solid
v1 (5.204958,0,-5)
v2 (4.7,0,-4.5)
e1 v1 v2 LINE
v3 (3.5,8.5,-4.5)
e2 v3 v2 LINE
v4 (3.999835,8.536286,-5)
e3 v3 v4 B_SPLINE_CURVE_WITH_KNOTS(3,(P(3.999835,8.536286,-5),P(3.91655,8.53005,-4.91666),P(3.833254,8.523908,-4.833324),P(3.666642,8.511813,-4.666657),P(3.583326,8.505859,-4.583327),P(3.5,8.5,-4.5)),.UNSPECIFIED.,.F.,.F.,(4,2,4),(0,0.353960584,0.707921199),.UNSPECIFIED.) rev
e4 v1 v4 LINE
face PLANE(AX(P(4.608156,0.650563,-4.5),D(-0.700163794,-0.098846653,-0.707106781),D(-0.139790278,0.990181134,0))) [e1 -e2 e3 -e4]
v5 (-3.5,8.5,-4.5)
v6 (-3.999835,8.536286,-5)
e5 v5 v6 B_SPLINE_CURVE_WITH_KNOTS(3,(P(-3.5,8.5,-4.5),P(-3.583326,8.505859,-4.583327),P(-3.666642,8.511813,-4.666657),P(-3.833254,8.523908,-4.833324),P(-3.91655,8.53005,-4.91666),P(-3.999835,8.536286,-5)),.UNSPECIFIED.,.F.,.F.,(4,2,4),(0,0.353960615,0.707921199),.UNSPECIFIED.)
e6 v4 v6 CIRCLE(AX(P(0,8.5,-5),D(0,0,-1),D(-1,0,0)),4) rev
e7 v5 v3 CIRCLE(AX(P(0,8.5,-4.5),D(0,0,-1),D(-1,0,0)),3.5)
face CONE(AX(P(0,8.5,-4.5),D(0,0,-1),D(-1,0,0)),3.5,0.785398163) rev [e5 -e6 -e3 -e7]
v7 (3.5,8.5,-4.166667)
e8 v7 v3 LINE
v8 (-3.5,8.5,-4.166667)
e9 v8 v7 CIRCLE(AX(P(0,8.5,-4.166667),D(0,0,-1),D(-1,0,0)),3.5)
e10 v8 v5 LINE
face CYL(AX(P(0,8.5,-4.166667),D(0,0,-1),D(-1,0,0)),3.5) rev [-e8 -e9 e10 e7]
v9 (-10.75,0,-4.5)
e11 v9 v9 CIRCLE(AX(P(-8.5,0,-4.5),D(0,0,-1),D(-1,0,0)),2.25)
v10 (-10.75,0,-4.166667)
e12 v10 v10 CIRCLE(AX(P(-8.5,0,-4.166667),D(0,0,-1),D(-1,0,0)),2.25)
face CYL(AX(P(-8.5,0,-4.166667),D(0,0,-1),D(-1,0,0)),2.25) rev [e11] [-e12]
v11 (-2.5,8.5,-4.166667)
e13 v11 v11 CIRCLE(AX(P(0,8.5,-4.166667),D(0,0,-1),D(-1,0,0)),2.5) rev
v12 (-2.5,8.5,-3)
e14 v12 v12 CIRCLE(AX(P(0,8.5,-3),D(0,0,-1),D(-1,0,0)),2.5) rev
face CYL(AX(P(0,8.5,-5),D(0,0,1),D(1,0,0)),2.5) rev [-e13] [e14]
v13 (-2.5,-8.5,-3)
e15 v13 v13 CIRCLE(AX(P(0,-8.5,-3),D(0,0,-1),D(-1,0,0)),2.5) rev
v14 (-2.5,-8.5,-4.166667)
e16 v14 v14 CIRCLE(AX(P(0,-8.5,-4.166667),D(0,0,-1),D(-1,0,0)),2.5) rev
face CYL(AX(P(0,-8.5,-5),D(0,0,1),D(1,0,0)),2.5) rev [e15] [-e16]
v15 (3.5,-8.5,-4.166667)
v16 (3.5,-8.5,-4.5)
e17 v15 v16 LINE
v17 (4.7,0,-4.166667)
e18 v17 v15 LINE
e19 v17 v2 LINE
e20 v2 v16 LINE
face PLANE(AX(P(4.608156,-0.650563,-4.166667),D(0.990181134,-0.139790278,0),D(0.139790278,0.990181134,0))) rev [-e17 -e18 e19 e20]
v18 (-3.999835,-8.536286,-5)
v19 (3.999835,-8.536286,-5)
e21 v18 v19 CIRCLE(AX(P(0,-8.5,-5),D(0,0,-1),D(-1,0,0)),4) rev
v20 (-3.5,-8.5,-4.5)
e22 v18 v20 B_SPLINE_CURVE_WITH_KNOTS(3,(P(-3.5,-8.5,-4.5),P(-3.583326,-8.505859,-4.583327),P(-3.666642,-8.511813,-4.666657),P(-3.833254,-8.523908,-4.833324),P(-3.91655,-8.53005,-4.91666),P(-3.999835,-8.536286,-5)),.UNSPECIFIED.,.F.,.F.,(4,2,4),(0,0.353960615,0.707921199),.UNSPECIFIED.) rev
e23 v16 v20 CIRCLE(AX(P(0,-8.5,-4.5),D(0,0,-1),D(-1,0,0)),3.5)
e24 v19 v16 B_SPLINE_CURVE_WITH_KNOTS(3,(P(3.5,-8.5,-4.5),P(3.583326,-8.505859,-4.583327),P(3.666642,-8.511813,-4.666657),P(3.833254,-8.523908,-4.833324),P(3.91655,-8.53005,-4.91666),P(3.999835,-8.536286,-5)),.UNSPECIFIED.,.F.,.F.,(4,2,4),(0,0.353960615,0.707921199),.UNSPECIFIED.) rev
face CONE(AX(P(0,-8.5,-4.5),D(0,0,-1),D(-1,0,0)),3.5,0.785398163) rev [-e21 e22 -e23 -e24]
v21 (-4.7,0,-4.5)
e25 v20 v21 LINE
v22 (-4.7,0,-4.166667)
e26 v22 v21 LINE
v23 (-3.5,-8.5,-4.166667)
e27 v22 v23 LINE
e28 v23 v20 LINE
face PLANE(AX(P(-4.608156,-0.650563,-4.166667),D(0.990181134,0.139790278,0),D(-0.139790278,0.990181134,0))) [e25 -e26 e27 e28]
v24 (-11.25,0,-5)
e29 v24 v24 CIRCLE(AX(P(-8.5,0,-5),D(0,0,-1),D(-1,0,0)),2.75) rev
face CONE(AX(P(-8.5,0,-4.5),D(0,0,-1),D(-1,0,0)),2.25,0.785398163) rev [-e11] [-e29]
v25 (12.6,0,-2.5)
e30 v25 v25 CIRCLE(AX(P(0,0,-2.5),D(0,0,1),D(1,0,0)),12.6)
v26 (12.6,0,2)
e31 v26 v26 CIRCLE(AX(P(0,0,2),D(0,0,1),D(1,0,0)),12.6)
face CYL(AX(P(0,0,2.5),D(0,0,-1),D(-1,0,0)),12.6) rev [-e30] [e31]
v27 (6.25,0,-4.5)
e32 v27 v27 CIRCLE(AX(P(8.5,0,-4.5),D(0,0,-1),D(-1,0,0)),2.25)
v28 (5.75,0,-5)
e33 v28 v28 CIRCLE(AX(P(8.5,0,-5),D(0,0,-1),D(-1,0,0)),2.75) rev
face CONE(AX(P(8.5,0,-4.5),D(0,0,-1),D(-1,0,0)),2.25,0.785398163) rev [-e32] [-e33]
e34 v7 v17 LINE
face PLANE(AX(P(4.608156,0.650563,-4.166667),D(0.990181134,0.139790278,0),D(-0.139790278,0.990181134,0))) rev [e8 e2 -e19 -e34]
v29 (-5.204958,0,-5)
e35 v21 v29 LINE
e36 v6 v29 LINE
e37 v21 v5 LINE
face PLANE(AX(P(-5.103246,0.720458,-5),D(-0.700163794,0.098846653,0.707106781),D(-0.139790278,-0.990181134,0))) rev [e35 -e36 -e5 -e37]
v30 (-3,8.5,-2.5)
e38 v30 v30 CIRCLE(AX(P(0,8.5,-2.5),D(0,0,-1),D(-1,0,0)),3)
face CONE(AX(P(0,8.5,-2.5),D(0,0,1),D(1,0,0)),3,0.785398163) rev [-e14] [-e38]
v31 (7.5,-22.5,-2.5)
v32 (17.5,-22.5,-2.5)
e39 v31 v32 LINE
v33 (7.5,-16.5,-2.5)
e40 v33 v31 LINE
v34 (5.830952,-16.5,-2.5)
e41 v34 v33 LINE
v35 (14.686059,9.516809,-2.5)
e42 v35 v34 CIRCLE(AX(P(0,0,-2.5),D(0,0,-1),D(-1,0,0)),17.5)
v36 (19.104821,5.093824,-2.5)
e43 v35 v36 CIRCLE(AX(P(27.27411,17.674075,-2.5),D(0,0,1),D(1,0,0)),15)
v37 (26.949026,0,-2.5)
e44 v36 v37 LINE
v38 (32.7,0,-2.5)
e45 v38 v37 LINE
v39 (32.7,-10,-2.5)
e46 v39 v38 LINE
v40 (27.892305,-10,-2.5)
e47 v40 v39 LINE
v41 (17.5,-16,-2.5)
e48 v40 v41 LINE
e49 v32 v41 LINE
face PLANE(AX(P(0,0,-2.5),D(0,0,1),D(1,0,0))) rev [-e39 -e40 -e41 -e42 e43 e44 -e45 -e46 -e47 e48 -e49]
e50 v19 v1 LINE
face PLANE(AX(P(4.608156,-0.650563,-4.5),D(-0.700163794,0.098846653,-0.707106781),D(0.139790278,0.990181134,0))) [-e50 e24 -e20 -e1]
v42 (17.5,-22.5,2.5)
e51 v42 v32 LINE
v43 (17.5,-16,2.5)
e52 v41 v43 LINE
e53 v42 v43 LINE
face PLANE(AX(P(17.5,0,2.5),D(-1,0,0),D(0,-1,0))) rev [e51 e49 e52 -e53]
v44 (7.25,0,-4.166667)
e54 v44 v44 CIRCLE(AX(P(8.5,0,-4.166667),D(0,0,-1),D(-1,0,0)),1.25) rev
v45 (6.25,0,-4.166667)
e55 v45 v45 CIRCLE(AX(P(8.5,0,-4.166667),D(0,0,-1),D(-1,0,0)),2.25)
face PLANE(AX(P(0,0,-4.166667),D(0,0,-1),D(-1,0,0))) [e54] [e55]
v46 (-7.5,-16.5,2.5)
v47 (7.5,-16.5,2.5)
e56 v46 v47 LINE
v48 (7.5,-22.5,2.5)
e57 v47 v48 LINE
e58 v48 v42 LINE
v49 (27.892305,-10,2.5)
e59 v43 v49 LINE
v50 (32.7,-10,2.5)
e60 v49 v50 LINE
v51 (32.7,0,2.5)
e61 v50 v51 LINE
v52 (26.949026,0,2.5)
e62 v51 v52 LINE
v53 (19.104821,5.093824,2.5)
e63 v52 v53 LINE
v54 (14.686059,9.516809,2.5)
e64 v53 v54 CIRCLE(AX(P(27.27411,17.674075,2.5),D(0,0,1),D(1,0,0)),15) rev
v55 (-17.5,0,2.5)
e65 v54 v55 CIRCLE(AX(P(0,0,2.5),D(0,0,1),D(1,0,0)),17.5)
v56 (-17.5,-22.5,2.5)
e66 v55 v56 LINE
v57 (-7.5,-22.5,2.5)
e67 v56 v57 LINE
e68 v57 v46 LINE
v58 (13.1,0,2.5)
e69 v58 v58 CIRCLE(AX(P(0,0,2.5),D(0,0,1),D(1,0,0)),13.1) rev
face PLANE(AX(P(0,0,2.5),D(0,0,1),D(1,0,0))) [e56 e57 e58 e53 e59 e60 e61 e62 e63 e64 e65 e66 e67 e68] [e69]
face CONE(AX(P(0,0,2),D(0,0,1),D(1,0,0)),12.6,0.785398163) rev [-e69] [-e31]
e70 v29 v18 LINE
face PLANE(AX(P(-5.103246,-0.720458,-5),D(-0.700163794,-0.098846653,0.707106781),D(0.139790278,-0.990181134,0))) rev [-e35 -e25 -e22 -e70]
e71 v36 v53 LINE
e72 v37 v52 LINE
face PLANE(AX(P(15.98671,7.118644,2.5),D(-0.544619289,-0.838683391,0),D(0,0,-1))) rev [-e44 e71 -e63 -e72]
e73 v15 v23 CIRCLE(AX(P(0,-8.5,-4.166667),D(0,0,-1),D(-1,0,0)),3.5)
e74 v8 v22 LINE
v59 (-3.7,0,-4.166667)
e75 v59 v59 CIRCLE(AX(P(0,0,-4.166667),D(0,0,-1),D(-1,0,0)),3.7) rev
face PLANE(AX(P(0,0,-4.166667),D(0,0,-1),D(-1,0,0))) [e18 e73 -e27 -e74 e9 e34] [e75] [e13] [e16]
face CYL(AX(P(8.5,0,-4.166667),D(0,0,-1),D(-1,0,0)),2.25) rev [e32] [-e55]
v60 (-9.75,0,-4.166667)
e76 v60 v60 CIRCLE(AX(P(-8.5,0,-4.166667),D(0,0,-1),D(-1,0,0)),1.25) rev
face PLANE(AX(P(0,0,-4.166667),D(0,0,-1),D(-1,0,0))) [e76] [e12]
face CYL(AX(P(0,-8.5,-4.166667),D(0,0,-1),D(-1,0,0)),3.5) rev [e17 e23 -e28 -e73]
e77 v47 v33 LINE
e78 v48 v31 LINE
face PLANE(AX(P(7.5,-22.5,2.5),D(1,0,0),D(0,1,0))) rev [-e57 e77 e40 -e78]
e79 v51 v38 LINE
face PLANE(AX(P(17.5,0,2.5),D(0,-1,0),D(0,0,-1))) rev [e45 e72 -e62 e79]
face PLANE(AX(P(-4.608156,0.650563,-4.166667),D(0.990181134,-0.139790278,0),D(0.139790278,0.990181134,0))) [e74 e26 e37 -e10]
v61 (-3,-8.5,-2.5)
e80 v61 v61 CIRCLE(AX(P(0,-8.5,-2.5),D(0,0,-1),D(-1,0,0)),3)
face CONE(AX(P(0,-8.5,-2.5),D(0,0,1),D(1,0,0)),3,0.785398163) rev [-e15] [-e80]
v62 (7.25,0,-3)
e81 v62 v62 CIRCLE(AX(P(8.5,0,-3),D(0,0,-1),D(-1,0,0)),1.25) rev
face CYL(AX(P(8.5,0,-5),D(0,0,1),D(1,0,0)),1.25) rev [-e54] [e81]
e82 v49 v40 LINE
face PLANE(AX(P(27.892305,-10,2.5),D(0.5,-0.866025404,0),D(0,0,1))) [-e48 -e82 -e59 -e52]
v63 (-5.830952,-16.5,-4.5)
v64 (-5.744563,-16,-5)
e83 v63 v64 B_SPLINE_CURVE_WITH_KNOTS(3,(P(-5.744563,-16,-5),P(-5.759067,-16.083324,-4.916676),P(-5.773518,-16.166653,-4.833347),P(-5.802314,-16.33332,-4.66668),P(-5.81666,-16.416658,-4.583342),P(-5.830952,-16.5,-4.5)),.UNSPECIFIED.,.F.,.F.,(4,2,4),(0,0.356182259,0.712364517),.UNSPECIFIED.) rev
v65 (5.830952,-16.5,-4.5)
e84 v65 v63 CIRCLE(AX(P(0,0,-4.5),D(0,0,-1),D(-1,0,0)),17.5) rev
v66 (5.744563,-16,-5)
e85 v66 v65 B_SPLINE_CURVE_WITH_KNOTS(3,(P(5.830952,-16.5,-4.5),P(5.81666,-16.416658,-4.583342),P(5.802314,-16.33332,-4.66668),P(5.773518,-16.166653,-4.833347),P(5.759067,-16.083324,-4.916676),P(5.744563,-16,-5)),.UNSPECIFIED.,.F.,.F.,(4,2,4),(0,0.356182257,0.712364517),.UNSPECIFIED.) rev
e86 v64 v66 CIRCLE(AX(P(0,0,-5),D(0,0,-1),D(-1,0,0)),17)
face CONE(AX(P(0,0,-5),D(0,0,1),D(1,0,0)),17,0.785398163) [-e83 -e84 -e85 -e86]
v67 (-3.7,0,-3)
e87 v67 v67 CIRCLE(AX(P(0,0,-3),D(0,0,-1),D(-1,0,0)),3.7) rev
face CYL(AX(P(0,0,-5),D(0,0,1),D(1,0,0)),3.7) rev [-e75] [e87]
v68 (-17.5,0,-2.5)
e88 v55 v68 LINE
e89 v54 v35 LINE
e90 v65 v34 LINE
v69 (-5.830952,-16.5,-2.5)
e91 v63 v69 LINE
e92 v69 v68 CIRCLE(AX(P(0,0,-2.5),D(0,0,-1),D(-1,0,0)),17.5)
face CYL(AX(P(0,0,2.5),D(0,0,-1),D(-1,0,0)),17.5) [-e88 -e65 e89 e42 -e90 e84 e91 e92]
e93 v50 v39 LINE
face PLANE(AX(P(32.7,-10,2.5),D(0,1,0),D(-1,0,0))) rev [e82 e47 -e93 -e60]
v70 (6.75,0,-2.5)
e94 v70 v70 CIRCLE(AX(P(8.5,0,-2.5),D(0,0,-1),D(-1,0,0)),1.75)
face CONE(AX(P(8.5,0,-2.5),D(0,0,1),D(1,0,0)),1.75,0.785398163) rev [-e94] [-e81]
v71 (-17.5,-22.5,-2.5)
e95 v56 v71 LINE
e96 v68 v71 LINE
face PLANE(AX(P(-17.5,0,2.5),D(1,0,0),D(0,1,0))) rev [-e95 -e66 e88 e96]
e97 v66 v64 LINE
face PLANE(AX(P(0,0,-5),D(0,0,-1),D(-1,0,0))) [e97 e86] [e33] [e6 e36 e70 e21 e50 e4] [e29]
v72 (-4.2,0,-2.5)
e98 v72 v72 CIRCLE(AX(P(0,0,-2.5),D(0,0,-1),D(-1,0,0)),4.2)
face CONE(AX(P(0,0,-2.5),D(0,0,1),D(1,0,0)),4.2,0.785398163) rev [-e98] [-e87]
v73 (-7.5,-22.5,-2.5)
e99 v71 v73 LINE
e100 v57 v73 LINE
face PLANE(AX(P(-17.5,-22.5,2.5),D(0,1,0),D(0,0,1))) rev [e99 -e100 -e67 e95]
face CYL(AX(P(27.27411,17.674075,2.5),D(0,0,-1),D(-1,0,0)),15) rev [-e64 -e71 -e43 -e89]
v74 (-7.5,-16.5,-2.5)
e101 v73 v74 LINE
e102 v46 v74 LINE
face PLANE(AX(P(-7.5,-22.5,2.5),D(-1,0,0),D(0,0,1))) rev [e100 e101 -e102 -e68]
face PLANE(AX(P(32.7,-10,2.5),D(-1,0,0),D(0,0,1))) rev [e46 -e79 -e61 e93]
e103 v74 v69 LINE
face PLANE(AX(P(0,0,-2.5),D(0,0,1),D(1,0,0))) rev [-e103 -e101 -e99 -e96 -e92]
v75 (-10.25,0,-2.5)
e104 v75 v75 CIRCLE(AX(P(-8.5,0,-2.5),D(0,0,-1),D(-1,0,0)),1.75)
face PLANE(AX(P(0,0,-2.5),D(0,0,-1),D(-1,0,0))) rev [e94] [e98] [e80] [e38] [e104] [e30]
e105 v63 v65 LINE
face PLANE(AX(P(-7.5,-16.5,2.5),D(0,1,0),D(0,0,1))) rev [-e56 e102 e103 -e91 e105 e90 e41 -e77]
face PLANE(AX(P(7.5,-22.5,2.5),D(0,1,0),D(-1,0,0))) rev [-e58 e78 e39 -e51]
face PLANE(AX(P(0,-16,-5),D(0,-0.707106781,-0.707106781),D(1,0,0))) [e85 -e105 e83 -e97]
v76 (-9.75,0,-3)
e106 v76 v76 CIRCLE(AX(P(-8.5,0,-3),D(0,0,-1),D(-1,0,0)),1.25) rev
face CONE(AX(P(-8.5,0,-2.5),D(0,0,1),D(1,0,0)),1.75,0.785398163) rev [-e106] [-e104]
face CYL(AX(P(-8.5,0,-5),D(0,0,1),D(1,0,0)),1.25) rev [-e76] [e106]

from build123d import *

# Parameters (mm, degrees)
SKETCH1_R           = 12.600000000000001
BOSS_EXTRUDE1_DEPTH = 2.5
BOSS_EXTRUDE3_DEPTH = 2.5
SKETCH4_R           = 1.2499999999999973
SKETCH4_R_2         = 2.5000000000000018
SKETCH4_R_3         = 3.7
BOSS_EXTRUDE4_DEPTH = 2.5
CUT_EXTRUDE1_START  = -0.8333333333333334
SKETCH5_R           = 2.249999999999998
SKETCH5_R_2         = 1.2499999999999973
SKETCH5_R_3         = 2.500000000000002
SKETCH5_R_4         = 3.7
SKETCH5_R_5         = 2.2499999999999987
CUT_EXTRUDE1_DEPTH  = 0.8333333333333334
CHAMFER1_SIZE       = 0.5
CHAMFER2_SIZE       = 0.5
FILLET2_R           = 15
CHAMFER6_SIZE       = 6
CHAMFER6_SIZE2      = 10.392304845413321


with BuildPart() as part:
    # Sketch1 → Boss-Extrude1 (new, symmetric)
    with BuildSketch(Plane.XY):
        with BuildLine():
            Line((-17.5, -22.500000000000004), (-7.500000000000002, -22.500000000000004))
            Line((-7.500000000000002, -22.500000000000004), (-7.500000000000002, -16.5))
            Line((-7.500000000000002, -16.5), (7.500000000000005, -16.5))
            Line((7.500000000000005, -16.5), (7.500000000000007, -22.500000000000004))
            Line((7.500000000000007, -22.500000000000004), (17.500000000000007, -22.5))
            Line((17.500000000000007, -22.5), (17.500000000000004, 0))
            ThreePointArc((17.500000000000004, 0), (-2.81e-15, 17.500000000000004), (-17.500000000000004, -6.94e-15))
            Line((-17.500000000000004, -6.94e-15), (-17.5, -22.500000000000004))
        make_face()
        Circle(SKETCH1_R, mode=Mode.SUBTRACT)
    extrude(amount=BOSS_EXTRUDE1_DEPTH, both=True)

    # Sketch3 → Boss-Extrude3 (add, symmetric)
    with BuildSketch(Plane.XY):
        Polygon((17.500000000000007, -10.000000000000002), (17.500000000000004, 0), (32.70000000000001, 0), (32.70000000000001, -10), align=None)
    extrude(amount=BOSS_EXTRUDE3_DEPTH, both=True)

    # Sketch4 → Boss-Extrude4 (add)
    with BuildSketch(Plane(origin=(0, 0, -2.5), x_dir=(-1, 0, 0), z_dir=(0, 0, -1))):
        with BuildLine():
            Line((5.8309518948453105, -16.5), (-5.8309518948453105, -16.5))
            ThreePointArc((-5.8309518948453105, -16.5), (4.96e-15, 17.500000000000004), (5.8309518948453105, -16.5))
        make_face()
        with Locations((-8.5, 0)):
            Circle(SKETCH4_R, mode=Mode.SUBTRACT)
        with Locations((8.5, 0)):
            Circle(SKETCH4_R, mode=Mode.SUBTRACT)
        with Locations((0, -8.5)):
            Circle(SKETCH4_R_2, mode=Mode.SUBTRACT)
        with Locations((0, 8.5)):
            Circle(SKETCH4_R_2, mode=Mode.SUBTRACT)
        Circle(SKETCH4_R_3, mode=Mode.SUBTRACT)
    extrude(amount=BOSS_EXTRUDE4_DEPTH)

    # Sketch5 → Cut-Extrude1 (cut)
    # profile 1 of 3: a face of its own
    with BuildSketch(Plane(origin=(0, 0, -5), x_dir=(-1, 0, 0), z_dir=(0, 0, -1)).offset(CUT_EXTRUDE1_START)):
        with Locations((-8.5, 0)):
            Circle(SKETCH5_R)
        with Locations((-8.5, 0)):
            Circle(SKETCH5_R_2, mode=Mode.SUBTRACT)
    # profile 2 of 3: a face of its own
    with BuildSketch(Plane(origin=(0, 0, -5), x_dir=(-1, 0, 0), z_dir=(0, 0, -1)).offset(CUT_EXTRUDE1_START)):
        with BuildLine():
            Line((3.500000000000002, 8.5), (4.7, 0))
            Line((4.7, 0), (3.500000000000002, -8.5))
            ThreePointArc((3.500000000000002, -8.5), (-6.4e-16, -12.000000000000002), (-3.500000000000002, -8.5))
            Line((-3.500000000000002, -8.5), (-4.7, 0))
            Line((-4.7, 0), (-3.500000000000002, 8.5))
            ThreePointArc((-3.500000000000002, 8.5), (2.1e-16, 12.000000000000002), (3.500000000000002, 8.5))
        make_face()
        with Locations((0, 8.5)):
            Circle(SKETCH5_R_3, mode=Mode.SUBTRACT)
        with Locations((0, -8.5)):
            Circle(SKETCH5_R_3, mode=Mode.SUBTRACT)
        Circle(SKETCH5_R_4, mode=Mode.SUBTRACT)
    # profile 3 of 3: a face of its own
    with BuildSketch(Plane(origin=(0, 0, -5), x_dir=(-1, 0, 0), z_dir=(0, 0, -1)).offset(CUT_EXTRUDE1_START)):
        with Locations((8.5, 0)):
            Circle(SKETCH5_R_5)
        with Locations((8.5, 0)):
            Circle(SKETCH5_R_2, mode=Mode.SUBTRACT)
    extrude(amount=CUT_EXTRUDE1_DEPTH, mode=Mode.SUBTRACT)

    # Chamfer1
    chamfer1_edges = [part.edges().sort_by_distance(p)[0] for p in [
        (-2.66e-15, 17.500000000000004, -5),
        (0, -16.5, -5),
        (10.749999999999998, 2.8e-16, -5),
        (-4.100000000000001, 4.25, -5),
        (-4.100000000000001, -4.25, -5),
        (-1e-17, 12, -5),
        (4.100000000000001, 4.25, -5),
        (4.100000000000001, -4.25, -5),
        (2.3e-16, -12, -5),
        (-6.250000000000002, 2.8e-16, -5),
    ]]
    chamfer(chamfer1_edges, length=CHAMFER1_SIZE)

    # Chamfer2
    chamfer2_edges = [part.edges().sort_by_distance(p)[0] for p in [
        (-12.600000000000001, 1.54e-15, 2.5),
        (3.7, 4.5e-16, -2.5),
        (2.5000000000000018, 8.5, -2.5),
        (2.5000000000000018, -8.5, -2.5),
        (-7.250000000000003, 1.5e-16, -2.5),
        (9.749999999999996, 1.5e-16, -2.5),
    ]]
    chamfer(chamfer2_edges, length=CHAMFER2_SIZE)

    # Chamfer4
    # the kernel refuses this chamfer: 12 mm, written as the material it adds along each edge
    with BuildSketch(Plane(origin=(17.500000000000004, 0, 2.5), x_dir=(0.999648118666469, -0.026526191709121207, 0), z_dir=(0, 0, -1))) as chamfer4_piece_1:
        with BuildLine():
            Line((9.855061796439113, 1e-17), (-2.110948481595115, -7.326644011468382))
            Line((-2.110948481595115, -7.326644011468382), (-2.3275279701108307, -7.223235476258414))
            ThreePointArc((-2.3275279701108307, -7.223235476258414), (-0.7534896907076923, -3.7391476844990703), (-0.239915548479951, 0.00636628601018905))
            Line((-0.239915548479951, 0.00636628601018905), (0.00636628601018909, 0.23991554847995256))
            ThreePointArc((0.00636628601018909, 0.23991554847995256), (4.93042998207199, 0.10925291314792994), (9.861428082449303, 0.2399155484799526))
            Line((9.861428082449303, 0.2399155484799526), (9.855061796439113, 1e-17))
        make_face()
    extrude(amount=5)

    # Fillet2
    fillet2_edges = [part.edges().sort_by_distance(p)[0] for p in [
        (15.986710313133337, 7.118644067795235, 0),
    ]]
    fillet(fillet2_edges, radius=FILLET2_R)

    # Chamfer6
    chamfer6_edges = [part.edges().sort_by_distance(p)[0] for p in [
        (17.500000000000007, -10.000000000000002, 0),
    ]]
    chamfer6_side = [part.faces().sort_by_distance(p)[0] for p in [
        (17.500000000000007, -16.25, 4e-17),
    ]]
    chamfer(chamfer6_edges, length=CHAMFER6_SIZE, length2=CHAMFER6_SIZE2, reference=chamfer6_side[0])


solid = part.part
